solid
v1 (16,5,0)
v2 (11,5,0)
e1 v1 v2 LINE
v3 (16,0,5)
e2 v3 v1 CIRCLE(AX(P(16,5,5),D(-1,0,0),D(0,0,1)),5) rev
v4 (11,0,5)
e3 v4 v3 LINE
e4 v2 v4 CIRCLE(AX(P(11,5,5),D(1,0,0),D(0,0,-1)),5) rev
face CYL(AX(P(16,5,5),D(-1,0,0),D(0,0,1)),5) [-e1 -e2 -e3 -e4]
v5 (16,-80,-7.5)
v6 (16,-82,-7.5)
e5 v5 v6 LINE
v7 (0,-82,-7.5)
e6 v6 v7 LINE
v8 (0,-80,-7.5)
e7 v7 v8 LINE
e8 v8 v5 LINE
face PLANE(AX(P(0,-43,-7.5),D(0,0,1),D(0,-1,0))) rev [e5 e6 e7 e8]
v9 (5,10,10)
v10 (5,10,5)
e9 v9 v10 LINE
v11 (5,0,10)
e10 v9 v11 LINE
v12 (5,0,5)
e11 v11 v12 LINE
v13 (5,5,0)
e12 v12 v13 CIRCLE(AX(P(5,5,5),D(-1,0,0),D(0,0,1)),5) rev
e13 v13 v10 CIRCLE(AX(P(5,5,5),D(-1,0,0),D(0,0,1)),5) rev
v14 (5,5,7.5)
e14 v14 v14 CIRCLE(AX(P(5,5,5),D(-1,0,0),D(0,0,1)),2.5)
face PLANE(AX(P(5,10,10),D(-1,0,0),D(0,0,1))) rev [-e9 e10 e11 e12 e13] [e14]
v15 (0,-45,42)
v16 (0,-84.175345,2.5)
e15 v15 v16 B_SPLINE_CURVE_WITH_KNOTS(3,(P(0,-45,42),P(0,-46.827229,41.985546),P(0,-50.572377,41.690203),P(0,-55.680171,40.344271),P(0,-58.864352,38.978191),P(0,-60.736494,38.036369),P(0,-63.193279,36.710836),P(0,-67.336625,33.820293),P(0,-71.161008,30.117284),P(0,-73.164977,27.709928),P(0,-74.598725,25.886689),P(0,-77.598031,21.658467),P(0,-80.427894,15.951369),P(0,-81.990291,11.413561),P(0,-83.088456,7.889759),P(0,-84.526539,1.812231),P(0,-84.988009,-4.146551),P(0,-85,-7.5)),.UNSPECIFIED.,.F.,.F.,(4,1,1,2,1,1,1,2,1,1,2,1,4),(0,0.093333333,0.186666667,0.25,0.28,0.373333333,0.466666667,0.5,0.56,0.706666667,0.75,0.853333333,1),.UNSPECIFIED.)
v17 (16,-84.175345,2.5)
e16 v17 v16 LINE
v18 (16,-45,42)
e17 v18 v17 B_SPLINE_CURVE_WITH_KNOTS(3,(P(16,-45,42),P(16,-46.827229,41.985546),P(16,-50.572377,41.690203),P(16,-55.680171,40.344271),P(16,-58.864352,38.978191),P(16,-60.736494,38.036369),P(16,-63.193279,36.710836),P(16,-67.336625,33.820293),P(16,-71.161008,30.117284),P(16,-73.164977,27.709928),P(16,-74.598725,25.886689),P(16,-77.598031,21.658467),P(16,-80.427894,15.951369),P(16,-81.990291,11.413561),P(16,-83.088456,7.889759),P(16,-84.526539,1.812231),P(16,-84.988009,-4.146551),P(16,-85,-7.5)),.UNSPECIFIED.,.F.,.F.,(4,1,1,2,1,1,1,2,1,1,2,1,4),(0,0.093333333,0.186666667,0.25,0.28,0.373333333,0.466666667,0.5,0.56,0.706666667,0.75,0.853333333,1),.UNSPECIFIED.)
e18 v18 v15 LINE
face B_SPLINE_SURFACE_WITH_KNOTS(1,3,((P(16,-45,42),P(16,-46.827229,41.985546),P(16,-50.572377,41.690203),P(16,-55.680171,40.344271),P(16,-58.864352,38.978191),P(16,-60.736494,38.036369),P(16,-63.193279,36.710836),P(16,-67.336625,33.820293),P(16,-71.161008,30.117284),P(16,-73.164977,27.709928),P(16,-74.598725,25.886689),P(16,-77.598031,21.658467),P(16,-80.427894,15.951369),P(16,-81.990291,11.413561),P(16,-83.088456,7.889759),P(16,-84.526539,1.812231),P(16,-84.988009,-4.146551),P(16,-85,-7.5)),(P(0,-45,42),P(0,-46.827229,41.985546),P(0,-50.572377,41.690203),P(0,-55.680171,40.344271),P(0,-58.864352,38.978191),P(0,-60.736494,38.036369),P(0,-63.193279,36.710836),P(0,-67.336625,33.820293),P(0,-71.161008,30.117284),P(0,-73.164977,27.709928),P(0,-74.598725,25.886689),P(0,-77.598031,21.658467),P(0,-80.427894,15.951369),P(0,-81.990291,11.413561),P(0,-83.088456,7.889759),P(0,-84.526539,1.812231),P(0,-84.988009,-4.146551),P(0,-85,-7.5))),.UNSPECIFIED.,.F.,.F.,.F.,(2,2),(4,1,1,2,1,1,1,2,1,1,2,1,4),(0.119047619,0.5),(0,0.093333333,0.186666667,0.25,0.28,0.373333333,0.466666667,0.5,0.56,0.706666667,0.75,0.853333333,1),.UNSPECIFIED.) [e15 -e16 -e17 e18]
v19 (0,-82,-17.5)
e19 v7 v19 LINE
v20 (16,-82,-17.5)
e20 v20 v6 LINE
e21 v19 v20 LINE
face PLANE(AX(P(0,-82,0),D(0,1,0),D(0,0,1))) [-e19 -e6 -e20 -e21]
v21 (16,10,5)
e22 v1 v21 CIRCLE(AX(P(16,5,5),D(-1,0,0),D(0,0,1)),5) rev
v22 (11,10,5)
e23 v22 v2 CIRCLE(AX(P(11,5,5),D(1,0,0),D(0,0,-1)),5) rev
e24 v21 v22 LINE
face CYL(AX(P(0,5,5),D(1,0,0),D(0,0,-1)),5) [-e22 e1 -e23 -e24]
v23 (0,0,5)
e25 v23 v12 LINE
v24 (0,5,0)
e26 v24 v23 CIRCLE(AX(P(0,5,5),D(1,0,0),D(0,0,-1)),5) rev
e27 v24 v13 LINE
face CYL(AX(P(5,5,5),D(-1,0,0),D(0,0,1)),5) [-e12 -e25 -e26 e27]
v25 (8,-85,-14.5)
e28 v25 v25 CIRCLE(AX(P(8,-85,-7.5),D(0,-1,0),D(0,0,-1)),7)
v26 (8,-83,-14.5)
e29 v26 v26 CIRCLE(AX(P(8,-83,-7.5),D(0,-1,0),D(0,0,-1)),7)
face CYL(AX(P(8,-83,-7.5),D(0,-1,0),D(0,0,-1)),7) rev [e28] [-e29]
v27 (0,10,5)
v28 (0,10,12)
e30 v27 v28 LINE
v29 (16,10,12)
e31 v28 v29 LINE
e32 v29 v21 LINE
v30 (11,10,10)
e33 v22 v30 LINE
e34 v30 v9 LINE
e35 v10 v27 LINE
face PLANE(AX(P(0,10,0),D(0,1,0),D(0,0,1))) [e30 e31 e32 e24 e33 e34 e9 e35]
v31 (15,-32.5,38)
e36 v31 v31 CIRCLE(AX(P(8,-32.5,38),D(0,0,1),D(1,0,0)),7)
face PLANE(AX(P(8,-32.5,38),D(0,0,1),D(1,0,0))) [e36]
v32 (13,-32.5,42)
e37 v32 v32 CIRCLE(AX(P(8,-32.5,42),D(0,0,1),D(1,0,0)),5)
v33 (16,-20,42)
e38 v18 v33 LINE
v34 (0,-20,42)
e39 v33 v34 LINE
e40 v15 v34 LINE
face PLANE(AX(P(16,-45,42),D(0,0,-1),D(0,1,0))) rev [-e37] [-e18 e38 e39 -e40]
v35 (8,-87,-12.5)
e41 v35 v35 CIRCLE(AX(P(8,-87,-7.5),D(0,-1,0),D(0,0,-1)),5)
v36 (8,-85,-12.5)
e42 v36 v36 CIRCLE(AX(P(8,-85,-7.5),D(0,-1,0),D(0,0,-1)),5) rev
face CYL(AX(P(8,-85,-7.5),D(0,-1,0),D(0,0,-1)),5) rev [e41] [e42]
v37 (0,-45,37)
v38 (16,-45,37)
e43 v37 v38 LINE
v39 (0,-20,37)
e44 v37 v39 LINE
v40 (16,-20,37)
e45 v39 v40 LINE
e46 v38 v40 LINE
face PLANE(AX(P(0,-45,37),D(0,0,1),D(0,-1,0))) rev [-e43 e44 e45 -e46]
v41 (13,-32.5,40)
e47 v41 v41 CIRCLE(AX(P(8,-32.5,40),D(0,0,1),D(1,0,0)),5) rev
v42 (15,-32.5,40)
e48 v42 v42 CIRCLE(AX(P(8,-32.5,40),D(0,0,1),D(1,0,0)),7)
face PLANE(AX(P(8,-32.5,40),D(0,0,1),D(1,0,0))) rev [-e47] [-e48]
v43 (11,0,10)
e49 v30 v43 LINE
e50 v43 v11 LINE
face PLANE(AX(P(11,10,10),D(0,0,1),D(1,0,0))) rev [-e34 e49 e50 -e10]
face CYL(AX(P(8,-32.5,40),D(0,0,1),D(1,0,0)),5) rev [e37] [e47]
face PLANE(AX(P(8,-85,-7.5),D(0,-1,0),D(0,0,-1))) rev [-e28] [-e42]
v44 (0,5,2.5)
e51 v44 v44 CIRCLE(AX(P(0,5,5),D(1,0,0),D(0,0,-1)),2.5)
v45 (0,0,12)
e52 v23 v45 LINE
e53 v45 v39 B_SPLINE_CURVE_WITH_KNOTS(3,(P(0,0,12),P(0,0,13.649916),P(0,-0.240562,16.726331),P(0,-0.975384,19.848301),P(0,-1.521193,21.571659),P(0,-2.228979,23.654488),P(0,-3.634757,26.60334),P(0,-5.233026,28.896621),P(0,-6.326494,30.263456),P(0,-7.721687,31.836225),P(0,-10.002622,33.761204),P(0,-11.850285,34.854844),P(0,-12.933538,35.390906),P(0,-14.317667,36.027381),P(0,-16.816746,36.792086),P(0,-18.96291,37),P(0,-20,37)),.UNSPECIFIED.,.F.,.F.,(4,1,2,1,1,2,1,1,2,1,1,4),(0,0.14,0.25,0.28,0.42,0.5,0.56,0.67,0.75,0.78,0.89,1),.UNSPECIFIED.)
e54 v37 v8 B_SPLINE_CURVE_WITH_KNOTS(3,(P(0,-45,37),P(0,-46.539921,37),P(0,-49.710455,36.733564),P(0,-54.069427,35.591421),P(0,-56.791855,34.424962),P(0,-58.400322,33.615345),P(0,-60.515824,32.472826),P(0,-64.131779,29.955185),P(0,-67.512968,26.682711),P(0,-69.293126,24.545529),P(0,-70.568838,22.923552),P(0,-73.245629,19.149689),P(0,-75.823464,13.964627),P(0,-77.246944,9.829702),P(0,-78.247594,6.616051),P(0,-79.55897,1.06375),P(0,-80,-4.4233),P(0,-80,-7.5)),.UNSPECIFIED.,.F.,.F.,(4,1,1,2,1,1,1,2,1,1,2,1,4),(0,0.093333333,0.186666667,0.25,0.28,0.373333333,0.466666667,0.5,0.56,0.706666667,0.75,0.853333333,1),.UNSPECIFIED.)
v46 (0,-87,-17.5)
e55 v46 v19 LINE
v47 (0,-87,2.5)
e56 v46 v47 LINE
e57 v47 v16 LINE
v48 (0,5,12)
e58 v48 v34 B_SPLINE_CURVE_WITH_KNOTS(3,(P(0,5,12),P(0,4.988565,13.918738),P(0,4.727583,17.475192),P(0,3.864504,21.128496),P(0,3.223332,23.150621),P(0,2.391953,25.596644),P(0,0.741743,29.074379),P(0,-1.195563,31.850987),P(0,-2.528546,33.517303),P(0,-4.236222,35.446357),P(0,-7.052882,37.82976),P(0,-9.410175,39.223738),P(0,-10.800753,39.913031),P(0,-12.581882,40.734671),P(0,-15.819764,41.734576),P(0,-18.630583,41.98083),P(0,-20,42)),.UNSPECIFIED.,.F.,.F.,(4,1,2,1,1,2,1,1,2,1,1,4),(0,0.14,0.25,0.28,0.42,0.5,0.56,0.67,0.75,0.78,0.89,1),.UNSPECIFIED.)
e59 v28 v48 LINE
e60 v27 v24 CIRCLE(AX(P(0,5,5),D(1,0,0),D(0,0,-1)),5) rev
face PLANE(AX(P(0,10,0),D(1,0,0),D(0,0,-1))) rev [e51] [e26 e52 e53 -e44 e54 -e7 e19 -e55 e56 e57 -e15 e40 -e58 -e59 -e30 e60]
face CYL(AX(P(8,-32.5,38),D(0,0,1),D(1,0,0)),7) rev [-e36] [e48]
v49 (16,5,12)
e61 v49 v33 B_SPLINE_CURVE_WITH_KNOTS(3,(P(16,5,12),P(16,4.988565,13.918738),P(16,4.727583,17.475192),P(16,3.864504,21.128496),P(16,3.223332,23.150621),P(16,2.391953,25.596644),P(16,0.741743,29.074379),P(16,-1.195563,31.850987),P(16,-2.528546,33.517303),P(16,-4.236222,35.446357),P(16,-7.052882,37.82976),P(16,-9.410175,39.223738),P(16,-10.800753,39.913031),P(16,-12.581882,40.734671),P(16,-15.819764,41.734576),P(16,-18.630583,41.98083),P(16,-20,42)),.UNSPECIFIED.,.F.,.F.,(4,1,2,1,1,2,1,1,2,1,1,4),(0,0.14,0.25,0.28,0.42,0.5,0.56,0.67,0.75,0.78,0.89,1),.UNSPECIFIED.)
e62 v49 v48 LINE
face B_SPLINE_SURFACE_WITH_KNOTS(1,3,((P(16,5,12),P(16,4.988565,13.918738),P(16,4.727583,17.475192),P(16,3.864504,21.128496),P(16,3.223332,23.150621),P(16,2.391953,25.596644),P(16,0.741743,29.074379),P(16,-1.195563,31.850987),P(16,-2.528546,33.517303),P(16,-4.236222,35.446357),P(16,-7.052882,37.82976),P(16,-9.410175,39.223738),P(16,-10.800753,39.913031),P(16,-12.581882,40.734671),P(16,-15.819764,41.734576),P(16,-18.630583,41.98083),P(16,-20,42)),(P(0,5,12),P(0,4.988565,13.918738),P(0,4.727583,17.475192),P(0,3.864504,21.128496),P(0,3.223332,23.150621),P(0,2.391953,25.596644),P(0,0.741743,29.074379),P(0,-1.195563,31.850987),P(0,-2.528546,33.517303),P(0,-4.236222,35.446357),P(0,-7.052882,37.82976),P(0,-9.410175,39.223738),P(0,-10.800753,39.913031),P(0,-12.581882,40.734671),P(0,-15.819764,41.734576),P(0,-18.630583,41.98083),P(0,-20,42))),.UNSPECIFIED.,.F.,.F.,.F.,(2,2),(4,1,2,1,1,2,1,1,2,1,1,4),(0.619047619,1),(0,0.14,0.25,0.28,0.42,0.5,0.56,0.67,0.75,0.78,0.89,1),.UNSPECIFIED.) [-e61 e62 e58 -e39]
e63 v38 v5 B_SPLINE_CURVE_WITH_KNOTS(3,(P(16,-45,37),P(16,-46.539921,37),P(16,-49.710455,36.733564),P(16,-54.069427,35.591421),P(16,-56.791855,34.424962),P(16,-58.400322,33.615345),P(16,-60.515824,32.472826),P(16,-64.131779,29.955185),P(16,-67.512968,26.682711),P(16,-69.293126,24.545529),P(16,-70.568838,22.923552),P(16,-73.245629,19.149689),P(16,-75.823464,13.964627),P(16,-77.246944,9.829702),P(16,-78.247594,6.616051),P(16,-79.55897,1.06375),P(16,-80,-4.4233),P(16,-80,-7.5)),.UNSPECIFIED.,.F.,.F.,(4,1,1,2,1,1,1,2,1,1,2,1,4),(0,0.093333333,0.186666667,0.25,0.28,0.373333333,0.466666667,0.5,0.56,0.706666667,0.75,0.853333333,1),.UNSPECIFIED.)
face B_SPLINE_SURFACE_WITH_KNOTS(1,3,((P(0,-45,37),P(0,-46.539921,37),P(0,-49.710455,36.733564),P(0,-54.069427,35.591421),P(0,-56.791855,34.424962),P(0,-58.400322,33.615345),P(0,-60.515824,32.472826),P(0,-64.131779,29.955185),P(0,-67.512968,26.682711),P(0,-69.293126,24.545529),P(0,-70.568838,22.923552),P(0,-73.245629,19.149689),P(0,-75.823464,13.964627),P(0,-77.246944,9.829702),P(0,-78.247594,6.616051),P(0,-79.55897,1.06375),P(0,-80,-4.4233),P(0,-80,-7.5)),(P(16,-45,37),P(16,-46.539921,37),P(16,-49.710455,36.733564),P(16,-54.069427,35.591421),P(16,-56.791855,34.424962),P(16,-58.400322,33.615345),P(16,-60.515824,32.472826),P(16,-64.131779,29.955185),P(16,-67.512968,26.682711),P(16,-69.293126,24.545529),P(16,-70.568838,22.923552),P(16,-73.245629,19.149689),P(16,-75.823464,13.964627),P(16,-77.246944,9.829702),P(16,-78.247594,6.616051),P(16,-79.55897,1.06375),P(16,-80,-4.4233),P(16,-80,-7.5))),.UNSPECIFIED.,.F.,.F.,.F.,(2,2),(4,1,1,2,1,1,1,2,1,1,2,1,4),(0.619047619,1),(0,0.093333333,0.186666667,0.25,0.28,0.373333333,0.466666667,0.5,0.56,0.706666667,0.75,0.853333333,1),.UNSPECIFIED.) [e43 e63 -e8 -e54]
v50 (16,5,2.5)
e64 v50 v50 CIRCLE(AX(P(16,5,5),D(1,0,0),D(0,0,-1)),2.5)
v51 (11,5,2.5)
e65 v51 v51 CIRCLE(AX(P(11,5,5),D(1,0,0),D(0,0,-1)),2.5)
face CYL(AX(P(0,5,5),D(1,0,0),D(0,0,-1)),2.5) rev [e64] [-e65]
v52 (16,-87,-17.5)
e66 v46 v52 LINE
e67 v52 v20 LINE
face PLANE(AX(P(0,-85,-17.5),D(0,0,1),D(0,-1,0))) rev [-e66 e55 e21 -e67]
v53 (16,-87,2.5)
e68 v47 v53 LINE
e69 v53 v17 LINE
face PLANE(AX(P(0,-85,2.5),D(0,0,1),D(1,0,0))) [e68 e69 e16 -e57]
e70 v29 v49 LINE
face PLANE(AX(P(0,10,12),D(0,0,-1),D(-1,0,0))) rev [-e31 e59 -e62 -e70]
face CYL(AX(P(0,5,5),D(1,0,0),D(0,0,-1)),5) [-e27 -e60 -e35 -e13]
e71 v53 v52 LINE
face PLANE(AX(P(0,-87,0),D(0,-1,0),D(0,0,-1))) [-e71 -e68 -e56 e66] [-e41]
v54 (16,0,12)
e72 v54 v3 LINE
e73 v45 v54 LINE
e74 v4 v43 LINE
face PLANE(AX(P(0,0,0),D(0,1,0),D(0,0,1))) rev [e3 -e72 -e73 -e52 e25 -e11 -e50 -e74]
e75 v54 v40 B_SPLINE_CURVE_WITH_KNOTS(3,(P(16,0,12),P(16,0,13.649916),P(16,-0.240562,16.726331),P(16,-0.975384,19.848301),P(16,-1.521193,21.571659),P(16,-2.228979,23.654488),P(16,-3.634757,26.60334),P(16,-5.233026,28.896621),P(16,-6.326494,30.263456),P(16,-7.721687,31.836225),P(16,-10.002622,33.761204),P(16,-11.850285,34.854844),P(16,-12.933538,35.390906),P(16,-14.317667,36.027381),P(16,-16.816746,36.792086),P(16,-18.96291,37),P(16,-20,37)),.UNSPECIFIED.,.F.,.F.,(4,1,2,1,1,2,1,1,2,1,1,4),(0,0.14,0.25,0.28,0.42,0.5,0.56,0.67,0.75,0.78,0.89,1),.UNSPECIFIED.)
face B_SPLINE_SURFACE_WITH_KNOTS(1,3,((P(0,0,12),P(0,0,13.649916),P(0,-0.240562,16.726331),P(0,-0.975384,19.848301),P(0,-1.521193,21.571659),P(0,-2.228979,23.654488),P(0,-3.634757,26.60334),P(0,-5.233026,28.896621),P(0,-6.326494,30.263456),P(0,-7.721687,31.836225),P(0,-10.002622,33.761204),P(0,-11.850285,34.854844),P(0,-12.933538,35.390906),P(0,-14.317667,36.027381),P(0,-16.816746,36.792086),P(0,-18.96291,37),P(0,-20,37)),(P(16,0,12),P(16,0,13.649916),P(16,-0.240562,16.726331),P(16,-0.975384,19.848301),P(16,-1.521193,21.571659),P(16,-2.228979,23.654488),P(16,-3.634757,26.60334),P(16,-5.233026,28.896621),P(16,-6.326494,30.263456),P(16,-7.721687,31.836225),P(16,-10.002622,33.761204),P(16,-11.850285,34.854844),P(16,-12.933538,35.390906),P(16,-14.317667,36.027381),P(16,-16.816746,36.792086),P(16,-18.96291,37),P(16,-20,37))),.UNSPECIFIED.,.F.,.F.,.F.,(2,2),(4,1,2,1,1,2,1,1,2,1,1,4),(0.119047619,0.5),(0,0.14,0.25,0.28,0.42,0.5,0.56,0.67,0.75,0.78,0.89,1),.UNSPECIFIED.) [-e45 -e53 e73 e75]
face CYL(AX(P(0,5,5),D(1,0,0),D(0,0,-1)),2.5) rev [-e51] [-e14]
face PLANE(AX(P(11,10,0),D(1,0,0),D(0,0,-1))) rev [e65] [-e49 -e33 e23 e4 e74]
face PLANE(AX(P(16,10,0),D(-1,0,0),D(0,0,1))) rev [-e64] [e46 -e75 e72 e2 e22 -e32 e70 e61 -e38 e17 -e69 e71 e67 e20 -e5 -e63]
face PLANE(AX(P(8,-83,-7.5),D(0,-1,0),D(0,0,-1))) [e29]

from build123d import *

# Parameters (mm, degrees)
BOSS_EXTRUDE2_DEPTH     = 10
CUT_EXTRUDE1_DEPTH      = 20.104973175
CUT_EXTRUDE1_DEPTH_BACK = 20.104973175
SKETCH3_R               = 2.5
SWEEP2_DEPTH            = 16
SKETCH6_W               = 16
SKETCH6_H               = 5
BOSS_EXTRUDE3_DEPTH     = 25
SWEEP4_DEPTH            = 16
BOSS_EXTRUDE6_START     = -2
BOSS_EXTRUDE6_DEPTH     = 5
MIRROR1_OUTLINE_W       = 5
MIRROR1_OUTLINE_H       = 10
MIRROR1_DEPTH           = 16
SKETCH10_R              = 5
CUT_EXTRUDE2_DEPTH      = 2
SKETCH11_R              = 7
CUT_EXTRUDE3_DEPTH      = 2
SKETCH12_R              = 5
CUT_EXTRUDE4_DEPTH      = 2
SKETCH13_R              = 7
CUT_EXTRUDE5_DEPTH      = 2
FILLET1_R               = 5


# Read off the part's stored shape, not the designer's step: Sweep2, Sweep4, Mirror1
with BuildPart() as part:
    # Sketch1 → Boss-Extrude2 (new body)
    with BuildSketch(Plane(origin=(0, 0, 0), x_dir=(1, 0, 0), z_dir=(0, 1, 0))):
        Polygon((16, 0), (11, 0), (11, -10), (5, -10), (5, 0), (0, 0), (0, -12), (16, -12), align=None)
    extrude(amount=BOSS_EXTRUDE2_DEPTH)

    # Sketch3 → Cut-Extrude1 (cut, two sides: drawn at the far end of the back side and taken through both)
    with BuildSketch(Plane(origin=(5, 0, 0), x_dir=(0, 0, -1), z_dir=(1, 0, 0)).offset(-CUT_EXTRUDE1_DEPTH_BACK)):
        with Locations((-5, 5)):
            Circle(SKETCH3_R)
    extrude(amount=CUT_EXTRUDE1_DEPTH + CUT_EXTRUDE1_DEPTH_BACK, mode=Mode.SUBTRACT)

    # Sweep2 outline → Sweep2 (add)
    with BuildSketch(Plane.YZ):
        with BuildLine():
            Line((0, 12), (5, 12))
            add(Edge.make_bspline(
                [(5, 12), (4.988564835, 13.918737728), (4.727583023, 17.475192083), (3.864503942, 21.128495988), (3.223332084, 23.150620925), (2.391953002, 25.596644311), (0.741742694, 29.07437946), (-1.195562511, 31.850987055), (-2.528545692, 33.517302555), (-4.236222293, 35.44635739), (-7.052881596, 37.829760239), (-9.410175401, 39.223738473), (-10.800753457, 39.913031483), (-12.581881784, 40.734670966), (-15.819763626, 41.734575995), (-18.630582656, 41.980830062), (-20, 42)],
                knots=[0, 0, 0, 0, 0.14, 0.25, 0.25, 0.28, 0.42, 0.5, 0.5, 0.56, 0.67, 0.75, 0.75, 0.78, 0.89, 1, 1, 1, 1], degree=3))
            Line((-20, 42), (-20, 37))
            add(Edge.make_bspline(
                [(0, 12), (0, 13.649915823), (-0.240561875, 16.726331061), (-0.97538393, 19.848301285), (-1.521193083, 21.57165859), (-2.228979288, 23.654488426), (-3.634756743, 26.603340395), (-5.233025509, 28.896620946), (-6.326493526, 30.263455967), (-7.72168743, 31.836224776), (-10.002621636, 33.761203681), (-11.850285326, 34.854843846), (-12.93353849, 35.390906407), (-14.317667102, 36.027380757), (-16.81674582, 36.792085808), (-18.962910054, 37), (-20, 37)],
                knots=[0, 0, 0, 0, 0.14, 0.25, 0.25, 0.28, 0.42, 0.5, 0.5, 0.56, 0.67, 0.75, 0.75, 0.78, 0.89, 1, 1, 1, 1], degree=3))
        make_face()
    extrude(amount=SWEEP2_DEPTH)

    # Sketch6 → Boss-Extrude3 (add)
    with BuildSketch(Plane.XZ.offset(20)):
        with Locations((8, 39.5)):
            Rectangle(SKETCH6_W, SKETCH6_H)
    extrude(amount=BOSS_EXTRUDE3_DEPTH)

    # Sweep4 outline → Sweep4 (add)
    with BuildSketch(Plane.YZ):
        with BuildLine():
            add(Edge.make_bspline(
                [(-45, 37), (-46.539921435, 37), (-49.710455321, 36.733564359), (-54.069426949, 35.591421338), (-56.791855208, 34.424962301), (-58.400322026, 33.61534539), (-60.515823703, 32.472825795), (-64.131778614, 29.955184919), (-67.512968495, 26.682711344), (-69.293125668, 24.545529462), (-70.568838354, 22.923551904), (-73.245629189, 19.149689178), (-75.823464115, 13.964627374), (-77.246943912, 9.829702386), (-78.247594027, 6.616051335), (-79.558969896, 1.063749954), (-80, -4.423299828), (-80, -7.5)],
                knots=[0, 0, 0, 0, 0.093333333, 0.186666667, 0.25, 0.25, 0.28, 0.373333333, 0.466666667, 0.5, 0.5, 0.56, 0.706666667, 0.75, 0.75, 0.853333333, 1, 1, 1, 1], degree=3))
            Line((-45, 37), (-45, 42))
            add(Edge.make_bspline(
                [(-45, 42), (-46.827228691, 41.985546272), (-50.572377089, 41.690203176), (-55.680170711, 40.34427149), (-58.86435237, 38.978190659), (-60.736493627, 38.036368786), (-63.19327858, 36.710836458), (-67.336625432, 33.820292899), (-71.161008214, 30.117283698), (-73.164977368, 27.709927549), (-74.598724896, 25.886689015), (-77.598031299, 21.658467407), (-80.427894177, 15.95136859), (-81.990291212, 11.413560853), (-83.08845552, 7.889758882), (-84.526539356, 1.812231065), (-84.988008876, -4.14655051), (-85, -7.5)],
                knots=[0, 0, 0, 0, 0.093333333, 0.186666667, 0.25, 0.25, 0.28, 0.373333333, 0.466666667, 0.5, 0.5, 0.56, 0.706666667, 0.75, 0.75, 0.853333333, 1, 1, 1, 1], degree=3))
            Line((-85, -7.5), (-80, -7.5))
        make_face()
    extrude(amount=SWEEP4_DEPTH)

    # 3DSketch1 → Boss-Extrude6 (add)
    with BuildSketch(Plane(origin=(0, -85, -7.5), x_dir=(0.8479983040050887, 0, 0.5299989400031789), z_dir=(0, 1, 0)).offset(BOSS_EXTRUDE6_START)):
        Polygon((0, 0), (13.567972864, 8.47998304), (18.867962264, 0), (5.2999894, -8.47998304), align=None)
    extrude(amount=BOSS_EXTRUDE6_DEPTH)

    # Mirror1 outline → Mirror1 (add)
    with BuildSketch(Plane.YZ):
        with Locations((-84.5, -12.5)):
            Rectangle(MIRROR1_OUTLINE_W, MIRROR1_OUTLINE_H)
    extrude(amount=MIRROR1_DEPTH)

    # Sketch10 → Cut-Extrude2 (cut)
    with BuildSketch(Plane.XY.offset(42)):
        with Locations((8, -32.5)):
            Circle(SKETCH10_R)
    extrude(amount=-CUT_EXTRUDE2_DEPTH, mode=Mode.SUBTRACT)

    # Sketch11 → Cut-Extrude3 (cut)
    with BuildSketch(Plane.XY.offset(40)):
        with Locations((8, -32.5)):
            Circle(SKETCH11_R)
    extrude(amount=-CUT_EXTRUDE3_DEPTH, mode=Mode.SUBTRACT)

    # Sketch12 → Cut-Extrude4 (cut)
    with BuildSketch(Plane.XZ.offset(87)):
        with Locations(Location((8, -7.5, 0), (0, 0, 270))):
            Circle(SKETCH12_R)
    extrude(amount=-CUT_EXTRUDE4_DEPTH, mode=Mode.SUBTRACT)

    # Sketch13 → Cut-Extrude5 (cut)
    with BuildSketch(Plane.XZ.offset(85)):
        with Locations(Location((8, -7.5, 0), (0, 0, 270))):
            Circle(SKETCH13_R)
    extrude(amount=-CUT_EXTRUDE5_DEPTH, mode=Mode.SUBTRACT)

    # Fillet1
    fillet1_edges = [part.edges().sort_by_distance(p)[0] for p in [
        (13.5, 10, 0),
        (13.5, 0, 0),
        (2.5, 0, 0),
        (2.5, 10, 0),
    ]]
    fillet(fillet1_edges, radius=FILLET1_R - 0.0001)  # a hair under: the kernel refuses the full size


solid = part.part
